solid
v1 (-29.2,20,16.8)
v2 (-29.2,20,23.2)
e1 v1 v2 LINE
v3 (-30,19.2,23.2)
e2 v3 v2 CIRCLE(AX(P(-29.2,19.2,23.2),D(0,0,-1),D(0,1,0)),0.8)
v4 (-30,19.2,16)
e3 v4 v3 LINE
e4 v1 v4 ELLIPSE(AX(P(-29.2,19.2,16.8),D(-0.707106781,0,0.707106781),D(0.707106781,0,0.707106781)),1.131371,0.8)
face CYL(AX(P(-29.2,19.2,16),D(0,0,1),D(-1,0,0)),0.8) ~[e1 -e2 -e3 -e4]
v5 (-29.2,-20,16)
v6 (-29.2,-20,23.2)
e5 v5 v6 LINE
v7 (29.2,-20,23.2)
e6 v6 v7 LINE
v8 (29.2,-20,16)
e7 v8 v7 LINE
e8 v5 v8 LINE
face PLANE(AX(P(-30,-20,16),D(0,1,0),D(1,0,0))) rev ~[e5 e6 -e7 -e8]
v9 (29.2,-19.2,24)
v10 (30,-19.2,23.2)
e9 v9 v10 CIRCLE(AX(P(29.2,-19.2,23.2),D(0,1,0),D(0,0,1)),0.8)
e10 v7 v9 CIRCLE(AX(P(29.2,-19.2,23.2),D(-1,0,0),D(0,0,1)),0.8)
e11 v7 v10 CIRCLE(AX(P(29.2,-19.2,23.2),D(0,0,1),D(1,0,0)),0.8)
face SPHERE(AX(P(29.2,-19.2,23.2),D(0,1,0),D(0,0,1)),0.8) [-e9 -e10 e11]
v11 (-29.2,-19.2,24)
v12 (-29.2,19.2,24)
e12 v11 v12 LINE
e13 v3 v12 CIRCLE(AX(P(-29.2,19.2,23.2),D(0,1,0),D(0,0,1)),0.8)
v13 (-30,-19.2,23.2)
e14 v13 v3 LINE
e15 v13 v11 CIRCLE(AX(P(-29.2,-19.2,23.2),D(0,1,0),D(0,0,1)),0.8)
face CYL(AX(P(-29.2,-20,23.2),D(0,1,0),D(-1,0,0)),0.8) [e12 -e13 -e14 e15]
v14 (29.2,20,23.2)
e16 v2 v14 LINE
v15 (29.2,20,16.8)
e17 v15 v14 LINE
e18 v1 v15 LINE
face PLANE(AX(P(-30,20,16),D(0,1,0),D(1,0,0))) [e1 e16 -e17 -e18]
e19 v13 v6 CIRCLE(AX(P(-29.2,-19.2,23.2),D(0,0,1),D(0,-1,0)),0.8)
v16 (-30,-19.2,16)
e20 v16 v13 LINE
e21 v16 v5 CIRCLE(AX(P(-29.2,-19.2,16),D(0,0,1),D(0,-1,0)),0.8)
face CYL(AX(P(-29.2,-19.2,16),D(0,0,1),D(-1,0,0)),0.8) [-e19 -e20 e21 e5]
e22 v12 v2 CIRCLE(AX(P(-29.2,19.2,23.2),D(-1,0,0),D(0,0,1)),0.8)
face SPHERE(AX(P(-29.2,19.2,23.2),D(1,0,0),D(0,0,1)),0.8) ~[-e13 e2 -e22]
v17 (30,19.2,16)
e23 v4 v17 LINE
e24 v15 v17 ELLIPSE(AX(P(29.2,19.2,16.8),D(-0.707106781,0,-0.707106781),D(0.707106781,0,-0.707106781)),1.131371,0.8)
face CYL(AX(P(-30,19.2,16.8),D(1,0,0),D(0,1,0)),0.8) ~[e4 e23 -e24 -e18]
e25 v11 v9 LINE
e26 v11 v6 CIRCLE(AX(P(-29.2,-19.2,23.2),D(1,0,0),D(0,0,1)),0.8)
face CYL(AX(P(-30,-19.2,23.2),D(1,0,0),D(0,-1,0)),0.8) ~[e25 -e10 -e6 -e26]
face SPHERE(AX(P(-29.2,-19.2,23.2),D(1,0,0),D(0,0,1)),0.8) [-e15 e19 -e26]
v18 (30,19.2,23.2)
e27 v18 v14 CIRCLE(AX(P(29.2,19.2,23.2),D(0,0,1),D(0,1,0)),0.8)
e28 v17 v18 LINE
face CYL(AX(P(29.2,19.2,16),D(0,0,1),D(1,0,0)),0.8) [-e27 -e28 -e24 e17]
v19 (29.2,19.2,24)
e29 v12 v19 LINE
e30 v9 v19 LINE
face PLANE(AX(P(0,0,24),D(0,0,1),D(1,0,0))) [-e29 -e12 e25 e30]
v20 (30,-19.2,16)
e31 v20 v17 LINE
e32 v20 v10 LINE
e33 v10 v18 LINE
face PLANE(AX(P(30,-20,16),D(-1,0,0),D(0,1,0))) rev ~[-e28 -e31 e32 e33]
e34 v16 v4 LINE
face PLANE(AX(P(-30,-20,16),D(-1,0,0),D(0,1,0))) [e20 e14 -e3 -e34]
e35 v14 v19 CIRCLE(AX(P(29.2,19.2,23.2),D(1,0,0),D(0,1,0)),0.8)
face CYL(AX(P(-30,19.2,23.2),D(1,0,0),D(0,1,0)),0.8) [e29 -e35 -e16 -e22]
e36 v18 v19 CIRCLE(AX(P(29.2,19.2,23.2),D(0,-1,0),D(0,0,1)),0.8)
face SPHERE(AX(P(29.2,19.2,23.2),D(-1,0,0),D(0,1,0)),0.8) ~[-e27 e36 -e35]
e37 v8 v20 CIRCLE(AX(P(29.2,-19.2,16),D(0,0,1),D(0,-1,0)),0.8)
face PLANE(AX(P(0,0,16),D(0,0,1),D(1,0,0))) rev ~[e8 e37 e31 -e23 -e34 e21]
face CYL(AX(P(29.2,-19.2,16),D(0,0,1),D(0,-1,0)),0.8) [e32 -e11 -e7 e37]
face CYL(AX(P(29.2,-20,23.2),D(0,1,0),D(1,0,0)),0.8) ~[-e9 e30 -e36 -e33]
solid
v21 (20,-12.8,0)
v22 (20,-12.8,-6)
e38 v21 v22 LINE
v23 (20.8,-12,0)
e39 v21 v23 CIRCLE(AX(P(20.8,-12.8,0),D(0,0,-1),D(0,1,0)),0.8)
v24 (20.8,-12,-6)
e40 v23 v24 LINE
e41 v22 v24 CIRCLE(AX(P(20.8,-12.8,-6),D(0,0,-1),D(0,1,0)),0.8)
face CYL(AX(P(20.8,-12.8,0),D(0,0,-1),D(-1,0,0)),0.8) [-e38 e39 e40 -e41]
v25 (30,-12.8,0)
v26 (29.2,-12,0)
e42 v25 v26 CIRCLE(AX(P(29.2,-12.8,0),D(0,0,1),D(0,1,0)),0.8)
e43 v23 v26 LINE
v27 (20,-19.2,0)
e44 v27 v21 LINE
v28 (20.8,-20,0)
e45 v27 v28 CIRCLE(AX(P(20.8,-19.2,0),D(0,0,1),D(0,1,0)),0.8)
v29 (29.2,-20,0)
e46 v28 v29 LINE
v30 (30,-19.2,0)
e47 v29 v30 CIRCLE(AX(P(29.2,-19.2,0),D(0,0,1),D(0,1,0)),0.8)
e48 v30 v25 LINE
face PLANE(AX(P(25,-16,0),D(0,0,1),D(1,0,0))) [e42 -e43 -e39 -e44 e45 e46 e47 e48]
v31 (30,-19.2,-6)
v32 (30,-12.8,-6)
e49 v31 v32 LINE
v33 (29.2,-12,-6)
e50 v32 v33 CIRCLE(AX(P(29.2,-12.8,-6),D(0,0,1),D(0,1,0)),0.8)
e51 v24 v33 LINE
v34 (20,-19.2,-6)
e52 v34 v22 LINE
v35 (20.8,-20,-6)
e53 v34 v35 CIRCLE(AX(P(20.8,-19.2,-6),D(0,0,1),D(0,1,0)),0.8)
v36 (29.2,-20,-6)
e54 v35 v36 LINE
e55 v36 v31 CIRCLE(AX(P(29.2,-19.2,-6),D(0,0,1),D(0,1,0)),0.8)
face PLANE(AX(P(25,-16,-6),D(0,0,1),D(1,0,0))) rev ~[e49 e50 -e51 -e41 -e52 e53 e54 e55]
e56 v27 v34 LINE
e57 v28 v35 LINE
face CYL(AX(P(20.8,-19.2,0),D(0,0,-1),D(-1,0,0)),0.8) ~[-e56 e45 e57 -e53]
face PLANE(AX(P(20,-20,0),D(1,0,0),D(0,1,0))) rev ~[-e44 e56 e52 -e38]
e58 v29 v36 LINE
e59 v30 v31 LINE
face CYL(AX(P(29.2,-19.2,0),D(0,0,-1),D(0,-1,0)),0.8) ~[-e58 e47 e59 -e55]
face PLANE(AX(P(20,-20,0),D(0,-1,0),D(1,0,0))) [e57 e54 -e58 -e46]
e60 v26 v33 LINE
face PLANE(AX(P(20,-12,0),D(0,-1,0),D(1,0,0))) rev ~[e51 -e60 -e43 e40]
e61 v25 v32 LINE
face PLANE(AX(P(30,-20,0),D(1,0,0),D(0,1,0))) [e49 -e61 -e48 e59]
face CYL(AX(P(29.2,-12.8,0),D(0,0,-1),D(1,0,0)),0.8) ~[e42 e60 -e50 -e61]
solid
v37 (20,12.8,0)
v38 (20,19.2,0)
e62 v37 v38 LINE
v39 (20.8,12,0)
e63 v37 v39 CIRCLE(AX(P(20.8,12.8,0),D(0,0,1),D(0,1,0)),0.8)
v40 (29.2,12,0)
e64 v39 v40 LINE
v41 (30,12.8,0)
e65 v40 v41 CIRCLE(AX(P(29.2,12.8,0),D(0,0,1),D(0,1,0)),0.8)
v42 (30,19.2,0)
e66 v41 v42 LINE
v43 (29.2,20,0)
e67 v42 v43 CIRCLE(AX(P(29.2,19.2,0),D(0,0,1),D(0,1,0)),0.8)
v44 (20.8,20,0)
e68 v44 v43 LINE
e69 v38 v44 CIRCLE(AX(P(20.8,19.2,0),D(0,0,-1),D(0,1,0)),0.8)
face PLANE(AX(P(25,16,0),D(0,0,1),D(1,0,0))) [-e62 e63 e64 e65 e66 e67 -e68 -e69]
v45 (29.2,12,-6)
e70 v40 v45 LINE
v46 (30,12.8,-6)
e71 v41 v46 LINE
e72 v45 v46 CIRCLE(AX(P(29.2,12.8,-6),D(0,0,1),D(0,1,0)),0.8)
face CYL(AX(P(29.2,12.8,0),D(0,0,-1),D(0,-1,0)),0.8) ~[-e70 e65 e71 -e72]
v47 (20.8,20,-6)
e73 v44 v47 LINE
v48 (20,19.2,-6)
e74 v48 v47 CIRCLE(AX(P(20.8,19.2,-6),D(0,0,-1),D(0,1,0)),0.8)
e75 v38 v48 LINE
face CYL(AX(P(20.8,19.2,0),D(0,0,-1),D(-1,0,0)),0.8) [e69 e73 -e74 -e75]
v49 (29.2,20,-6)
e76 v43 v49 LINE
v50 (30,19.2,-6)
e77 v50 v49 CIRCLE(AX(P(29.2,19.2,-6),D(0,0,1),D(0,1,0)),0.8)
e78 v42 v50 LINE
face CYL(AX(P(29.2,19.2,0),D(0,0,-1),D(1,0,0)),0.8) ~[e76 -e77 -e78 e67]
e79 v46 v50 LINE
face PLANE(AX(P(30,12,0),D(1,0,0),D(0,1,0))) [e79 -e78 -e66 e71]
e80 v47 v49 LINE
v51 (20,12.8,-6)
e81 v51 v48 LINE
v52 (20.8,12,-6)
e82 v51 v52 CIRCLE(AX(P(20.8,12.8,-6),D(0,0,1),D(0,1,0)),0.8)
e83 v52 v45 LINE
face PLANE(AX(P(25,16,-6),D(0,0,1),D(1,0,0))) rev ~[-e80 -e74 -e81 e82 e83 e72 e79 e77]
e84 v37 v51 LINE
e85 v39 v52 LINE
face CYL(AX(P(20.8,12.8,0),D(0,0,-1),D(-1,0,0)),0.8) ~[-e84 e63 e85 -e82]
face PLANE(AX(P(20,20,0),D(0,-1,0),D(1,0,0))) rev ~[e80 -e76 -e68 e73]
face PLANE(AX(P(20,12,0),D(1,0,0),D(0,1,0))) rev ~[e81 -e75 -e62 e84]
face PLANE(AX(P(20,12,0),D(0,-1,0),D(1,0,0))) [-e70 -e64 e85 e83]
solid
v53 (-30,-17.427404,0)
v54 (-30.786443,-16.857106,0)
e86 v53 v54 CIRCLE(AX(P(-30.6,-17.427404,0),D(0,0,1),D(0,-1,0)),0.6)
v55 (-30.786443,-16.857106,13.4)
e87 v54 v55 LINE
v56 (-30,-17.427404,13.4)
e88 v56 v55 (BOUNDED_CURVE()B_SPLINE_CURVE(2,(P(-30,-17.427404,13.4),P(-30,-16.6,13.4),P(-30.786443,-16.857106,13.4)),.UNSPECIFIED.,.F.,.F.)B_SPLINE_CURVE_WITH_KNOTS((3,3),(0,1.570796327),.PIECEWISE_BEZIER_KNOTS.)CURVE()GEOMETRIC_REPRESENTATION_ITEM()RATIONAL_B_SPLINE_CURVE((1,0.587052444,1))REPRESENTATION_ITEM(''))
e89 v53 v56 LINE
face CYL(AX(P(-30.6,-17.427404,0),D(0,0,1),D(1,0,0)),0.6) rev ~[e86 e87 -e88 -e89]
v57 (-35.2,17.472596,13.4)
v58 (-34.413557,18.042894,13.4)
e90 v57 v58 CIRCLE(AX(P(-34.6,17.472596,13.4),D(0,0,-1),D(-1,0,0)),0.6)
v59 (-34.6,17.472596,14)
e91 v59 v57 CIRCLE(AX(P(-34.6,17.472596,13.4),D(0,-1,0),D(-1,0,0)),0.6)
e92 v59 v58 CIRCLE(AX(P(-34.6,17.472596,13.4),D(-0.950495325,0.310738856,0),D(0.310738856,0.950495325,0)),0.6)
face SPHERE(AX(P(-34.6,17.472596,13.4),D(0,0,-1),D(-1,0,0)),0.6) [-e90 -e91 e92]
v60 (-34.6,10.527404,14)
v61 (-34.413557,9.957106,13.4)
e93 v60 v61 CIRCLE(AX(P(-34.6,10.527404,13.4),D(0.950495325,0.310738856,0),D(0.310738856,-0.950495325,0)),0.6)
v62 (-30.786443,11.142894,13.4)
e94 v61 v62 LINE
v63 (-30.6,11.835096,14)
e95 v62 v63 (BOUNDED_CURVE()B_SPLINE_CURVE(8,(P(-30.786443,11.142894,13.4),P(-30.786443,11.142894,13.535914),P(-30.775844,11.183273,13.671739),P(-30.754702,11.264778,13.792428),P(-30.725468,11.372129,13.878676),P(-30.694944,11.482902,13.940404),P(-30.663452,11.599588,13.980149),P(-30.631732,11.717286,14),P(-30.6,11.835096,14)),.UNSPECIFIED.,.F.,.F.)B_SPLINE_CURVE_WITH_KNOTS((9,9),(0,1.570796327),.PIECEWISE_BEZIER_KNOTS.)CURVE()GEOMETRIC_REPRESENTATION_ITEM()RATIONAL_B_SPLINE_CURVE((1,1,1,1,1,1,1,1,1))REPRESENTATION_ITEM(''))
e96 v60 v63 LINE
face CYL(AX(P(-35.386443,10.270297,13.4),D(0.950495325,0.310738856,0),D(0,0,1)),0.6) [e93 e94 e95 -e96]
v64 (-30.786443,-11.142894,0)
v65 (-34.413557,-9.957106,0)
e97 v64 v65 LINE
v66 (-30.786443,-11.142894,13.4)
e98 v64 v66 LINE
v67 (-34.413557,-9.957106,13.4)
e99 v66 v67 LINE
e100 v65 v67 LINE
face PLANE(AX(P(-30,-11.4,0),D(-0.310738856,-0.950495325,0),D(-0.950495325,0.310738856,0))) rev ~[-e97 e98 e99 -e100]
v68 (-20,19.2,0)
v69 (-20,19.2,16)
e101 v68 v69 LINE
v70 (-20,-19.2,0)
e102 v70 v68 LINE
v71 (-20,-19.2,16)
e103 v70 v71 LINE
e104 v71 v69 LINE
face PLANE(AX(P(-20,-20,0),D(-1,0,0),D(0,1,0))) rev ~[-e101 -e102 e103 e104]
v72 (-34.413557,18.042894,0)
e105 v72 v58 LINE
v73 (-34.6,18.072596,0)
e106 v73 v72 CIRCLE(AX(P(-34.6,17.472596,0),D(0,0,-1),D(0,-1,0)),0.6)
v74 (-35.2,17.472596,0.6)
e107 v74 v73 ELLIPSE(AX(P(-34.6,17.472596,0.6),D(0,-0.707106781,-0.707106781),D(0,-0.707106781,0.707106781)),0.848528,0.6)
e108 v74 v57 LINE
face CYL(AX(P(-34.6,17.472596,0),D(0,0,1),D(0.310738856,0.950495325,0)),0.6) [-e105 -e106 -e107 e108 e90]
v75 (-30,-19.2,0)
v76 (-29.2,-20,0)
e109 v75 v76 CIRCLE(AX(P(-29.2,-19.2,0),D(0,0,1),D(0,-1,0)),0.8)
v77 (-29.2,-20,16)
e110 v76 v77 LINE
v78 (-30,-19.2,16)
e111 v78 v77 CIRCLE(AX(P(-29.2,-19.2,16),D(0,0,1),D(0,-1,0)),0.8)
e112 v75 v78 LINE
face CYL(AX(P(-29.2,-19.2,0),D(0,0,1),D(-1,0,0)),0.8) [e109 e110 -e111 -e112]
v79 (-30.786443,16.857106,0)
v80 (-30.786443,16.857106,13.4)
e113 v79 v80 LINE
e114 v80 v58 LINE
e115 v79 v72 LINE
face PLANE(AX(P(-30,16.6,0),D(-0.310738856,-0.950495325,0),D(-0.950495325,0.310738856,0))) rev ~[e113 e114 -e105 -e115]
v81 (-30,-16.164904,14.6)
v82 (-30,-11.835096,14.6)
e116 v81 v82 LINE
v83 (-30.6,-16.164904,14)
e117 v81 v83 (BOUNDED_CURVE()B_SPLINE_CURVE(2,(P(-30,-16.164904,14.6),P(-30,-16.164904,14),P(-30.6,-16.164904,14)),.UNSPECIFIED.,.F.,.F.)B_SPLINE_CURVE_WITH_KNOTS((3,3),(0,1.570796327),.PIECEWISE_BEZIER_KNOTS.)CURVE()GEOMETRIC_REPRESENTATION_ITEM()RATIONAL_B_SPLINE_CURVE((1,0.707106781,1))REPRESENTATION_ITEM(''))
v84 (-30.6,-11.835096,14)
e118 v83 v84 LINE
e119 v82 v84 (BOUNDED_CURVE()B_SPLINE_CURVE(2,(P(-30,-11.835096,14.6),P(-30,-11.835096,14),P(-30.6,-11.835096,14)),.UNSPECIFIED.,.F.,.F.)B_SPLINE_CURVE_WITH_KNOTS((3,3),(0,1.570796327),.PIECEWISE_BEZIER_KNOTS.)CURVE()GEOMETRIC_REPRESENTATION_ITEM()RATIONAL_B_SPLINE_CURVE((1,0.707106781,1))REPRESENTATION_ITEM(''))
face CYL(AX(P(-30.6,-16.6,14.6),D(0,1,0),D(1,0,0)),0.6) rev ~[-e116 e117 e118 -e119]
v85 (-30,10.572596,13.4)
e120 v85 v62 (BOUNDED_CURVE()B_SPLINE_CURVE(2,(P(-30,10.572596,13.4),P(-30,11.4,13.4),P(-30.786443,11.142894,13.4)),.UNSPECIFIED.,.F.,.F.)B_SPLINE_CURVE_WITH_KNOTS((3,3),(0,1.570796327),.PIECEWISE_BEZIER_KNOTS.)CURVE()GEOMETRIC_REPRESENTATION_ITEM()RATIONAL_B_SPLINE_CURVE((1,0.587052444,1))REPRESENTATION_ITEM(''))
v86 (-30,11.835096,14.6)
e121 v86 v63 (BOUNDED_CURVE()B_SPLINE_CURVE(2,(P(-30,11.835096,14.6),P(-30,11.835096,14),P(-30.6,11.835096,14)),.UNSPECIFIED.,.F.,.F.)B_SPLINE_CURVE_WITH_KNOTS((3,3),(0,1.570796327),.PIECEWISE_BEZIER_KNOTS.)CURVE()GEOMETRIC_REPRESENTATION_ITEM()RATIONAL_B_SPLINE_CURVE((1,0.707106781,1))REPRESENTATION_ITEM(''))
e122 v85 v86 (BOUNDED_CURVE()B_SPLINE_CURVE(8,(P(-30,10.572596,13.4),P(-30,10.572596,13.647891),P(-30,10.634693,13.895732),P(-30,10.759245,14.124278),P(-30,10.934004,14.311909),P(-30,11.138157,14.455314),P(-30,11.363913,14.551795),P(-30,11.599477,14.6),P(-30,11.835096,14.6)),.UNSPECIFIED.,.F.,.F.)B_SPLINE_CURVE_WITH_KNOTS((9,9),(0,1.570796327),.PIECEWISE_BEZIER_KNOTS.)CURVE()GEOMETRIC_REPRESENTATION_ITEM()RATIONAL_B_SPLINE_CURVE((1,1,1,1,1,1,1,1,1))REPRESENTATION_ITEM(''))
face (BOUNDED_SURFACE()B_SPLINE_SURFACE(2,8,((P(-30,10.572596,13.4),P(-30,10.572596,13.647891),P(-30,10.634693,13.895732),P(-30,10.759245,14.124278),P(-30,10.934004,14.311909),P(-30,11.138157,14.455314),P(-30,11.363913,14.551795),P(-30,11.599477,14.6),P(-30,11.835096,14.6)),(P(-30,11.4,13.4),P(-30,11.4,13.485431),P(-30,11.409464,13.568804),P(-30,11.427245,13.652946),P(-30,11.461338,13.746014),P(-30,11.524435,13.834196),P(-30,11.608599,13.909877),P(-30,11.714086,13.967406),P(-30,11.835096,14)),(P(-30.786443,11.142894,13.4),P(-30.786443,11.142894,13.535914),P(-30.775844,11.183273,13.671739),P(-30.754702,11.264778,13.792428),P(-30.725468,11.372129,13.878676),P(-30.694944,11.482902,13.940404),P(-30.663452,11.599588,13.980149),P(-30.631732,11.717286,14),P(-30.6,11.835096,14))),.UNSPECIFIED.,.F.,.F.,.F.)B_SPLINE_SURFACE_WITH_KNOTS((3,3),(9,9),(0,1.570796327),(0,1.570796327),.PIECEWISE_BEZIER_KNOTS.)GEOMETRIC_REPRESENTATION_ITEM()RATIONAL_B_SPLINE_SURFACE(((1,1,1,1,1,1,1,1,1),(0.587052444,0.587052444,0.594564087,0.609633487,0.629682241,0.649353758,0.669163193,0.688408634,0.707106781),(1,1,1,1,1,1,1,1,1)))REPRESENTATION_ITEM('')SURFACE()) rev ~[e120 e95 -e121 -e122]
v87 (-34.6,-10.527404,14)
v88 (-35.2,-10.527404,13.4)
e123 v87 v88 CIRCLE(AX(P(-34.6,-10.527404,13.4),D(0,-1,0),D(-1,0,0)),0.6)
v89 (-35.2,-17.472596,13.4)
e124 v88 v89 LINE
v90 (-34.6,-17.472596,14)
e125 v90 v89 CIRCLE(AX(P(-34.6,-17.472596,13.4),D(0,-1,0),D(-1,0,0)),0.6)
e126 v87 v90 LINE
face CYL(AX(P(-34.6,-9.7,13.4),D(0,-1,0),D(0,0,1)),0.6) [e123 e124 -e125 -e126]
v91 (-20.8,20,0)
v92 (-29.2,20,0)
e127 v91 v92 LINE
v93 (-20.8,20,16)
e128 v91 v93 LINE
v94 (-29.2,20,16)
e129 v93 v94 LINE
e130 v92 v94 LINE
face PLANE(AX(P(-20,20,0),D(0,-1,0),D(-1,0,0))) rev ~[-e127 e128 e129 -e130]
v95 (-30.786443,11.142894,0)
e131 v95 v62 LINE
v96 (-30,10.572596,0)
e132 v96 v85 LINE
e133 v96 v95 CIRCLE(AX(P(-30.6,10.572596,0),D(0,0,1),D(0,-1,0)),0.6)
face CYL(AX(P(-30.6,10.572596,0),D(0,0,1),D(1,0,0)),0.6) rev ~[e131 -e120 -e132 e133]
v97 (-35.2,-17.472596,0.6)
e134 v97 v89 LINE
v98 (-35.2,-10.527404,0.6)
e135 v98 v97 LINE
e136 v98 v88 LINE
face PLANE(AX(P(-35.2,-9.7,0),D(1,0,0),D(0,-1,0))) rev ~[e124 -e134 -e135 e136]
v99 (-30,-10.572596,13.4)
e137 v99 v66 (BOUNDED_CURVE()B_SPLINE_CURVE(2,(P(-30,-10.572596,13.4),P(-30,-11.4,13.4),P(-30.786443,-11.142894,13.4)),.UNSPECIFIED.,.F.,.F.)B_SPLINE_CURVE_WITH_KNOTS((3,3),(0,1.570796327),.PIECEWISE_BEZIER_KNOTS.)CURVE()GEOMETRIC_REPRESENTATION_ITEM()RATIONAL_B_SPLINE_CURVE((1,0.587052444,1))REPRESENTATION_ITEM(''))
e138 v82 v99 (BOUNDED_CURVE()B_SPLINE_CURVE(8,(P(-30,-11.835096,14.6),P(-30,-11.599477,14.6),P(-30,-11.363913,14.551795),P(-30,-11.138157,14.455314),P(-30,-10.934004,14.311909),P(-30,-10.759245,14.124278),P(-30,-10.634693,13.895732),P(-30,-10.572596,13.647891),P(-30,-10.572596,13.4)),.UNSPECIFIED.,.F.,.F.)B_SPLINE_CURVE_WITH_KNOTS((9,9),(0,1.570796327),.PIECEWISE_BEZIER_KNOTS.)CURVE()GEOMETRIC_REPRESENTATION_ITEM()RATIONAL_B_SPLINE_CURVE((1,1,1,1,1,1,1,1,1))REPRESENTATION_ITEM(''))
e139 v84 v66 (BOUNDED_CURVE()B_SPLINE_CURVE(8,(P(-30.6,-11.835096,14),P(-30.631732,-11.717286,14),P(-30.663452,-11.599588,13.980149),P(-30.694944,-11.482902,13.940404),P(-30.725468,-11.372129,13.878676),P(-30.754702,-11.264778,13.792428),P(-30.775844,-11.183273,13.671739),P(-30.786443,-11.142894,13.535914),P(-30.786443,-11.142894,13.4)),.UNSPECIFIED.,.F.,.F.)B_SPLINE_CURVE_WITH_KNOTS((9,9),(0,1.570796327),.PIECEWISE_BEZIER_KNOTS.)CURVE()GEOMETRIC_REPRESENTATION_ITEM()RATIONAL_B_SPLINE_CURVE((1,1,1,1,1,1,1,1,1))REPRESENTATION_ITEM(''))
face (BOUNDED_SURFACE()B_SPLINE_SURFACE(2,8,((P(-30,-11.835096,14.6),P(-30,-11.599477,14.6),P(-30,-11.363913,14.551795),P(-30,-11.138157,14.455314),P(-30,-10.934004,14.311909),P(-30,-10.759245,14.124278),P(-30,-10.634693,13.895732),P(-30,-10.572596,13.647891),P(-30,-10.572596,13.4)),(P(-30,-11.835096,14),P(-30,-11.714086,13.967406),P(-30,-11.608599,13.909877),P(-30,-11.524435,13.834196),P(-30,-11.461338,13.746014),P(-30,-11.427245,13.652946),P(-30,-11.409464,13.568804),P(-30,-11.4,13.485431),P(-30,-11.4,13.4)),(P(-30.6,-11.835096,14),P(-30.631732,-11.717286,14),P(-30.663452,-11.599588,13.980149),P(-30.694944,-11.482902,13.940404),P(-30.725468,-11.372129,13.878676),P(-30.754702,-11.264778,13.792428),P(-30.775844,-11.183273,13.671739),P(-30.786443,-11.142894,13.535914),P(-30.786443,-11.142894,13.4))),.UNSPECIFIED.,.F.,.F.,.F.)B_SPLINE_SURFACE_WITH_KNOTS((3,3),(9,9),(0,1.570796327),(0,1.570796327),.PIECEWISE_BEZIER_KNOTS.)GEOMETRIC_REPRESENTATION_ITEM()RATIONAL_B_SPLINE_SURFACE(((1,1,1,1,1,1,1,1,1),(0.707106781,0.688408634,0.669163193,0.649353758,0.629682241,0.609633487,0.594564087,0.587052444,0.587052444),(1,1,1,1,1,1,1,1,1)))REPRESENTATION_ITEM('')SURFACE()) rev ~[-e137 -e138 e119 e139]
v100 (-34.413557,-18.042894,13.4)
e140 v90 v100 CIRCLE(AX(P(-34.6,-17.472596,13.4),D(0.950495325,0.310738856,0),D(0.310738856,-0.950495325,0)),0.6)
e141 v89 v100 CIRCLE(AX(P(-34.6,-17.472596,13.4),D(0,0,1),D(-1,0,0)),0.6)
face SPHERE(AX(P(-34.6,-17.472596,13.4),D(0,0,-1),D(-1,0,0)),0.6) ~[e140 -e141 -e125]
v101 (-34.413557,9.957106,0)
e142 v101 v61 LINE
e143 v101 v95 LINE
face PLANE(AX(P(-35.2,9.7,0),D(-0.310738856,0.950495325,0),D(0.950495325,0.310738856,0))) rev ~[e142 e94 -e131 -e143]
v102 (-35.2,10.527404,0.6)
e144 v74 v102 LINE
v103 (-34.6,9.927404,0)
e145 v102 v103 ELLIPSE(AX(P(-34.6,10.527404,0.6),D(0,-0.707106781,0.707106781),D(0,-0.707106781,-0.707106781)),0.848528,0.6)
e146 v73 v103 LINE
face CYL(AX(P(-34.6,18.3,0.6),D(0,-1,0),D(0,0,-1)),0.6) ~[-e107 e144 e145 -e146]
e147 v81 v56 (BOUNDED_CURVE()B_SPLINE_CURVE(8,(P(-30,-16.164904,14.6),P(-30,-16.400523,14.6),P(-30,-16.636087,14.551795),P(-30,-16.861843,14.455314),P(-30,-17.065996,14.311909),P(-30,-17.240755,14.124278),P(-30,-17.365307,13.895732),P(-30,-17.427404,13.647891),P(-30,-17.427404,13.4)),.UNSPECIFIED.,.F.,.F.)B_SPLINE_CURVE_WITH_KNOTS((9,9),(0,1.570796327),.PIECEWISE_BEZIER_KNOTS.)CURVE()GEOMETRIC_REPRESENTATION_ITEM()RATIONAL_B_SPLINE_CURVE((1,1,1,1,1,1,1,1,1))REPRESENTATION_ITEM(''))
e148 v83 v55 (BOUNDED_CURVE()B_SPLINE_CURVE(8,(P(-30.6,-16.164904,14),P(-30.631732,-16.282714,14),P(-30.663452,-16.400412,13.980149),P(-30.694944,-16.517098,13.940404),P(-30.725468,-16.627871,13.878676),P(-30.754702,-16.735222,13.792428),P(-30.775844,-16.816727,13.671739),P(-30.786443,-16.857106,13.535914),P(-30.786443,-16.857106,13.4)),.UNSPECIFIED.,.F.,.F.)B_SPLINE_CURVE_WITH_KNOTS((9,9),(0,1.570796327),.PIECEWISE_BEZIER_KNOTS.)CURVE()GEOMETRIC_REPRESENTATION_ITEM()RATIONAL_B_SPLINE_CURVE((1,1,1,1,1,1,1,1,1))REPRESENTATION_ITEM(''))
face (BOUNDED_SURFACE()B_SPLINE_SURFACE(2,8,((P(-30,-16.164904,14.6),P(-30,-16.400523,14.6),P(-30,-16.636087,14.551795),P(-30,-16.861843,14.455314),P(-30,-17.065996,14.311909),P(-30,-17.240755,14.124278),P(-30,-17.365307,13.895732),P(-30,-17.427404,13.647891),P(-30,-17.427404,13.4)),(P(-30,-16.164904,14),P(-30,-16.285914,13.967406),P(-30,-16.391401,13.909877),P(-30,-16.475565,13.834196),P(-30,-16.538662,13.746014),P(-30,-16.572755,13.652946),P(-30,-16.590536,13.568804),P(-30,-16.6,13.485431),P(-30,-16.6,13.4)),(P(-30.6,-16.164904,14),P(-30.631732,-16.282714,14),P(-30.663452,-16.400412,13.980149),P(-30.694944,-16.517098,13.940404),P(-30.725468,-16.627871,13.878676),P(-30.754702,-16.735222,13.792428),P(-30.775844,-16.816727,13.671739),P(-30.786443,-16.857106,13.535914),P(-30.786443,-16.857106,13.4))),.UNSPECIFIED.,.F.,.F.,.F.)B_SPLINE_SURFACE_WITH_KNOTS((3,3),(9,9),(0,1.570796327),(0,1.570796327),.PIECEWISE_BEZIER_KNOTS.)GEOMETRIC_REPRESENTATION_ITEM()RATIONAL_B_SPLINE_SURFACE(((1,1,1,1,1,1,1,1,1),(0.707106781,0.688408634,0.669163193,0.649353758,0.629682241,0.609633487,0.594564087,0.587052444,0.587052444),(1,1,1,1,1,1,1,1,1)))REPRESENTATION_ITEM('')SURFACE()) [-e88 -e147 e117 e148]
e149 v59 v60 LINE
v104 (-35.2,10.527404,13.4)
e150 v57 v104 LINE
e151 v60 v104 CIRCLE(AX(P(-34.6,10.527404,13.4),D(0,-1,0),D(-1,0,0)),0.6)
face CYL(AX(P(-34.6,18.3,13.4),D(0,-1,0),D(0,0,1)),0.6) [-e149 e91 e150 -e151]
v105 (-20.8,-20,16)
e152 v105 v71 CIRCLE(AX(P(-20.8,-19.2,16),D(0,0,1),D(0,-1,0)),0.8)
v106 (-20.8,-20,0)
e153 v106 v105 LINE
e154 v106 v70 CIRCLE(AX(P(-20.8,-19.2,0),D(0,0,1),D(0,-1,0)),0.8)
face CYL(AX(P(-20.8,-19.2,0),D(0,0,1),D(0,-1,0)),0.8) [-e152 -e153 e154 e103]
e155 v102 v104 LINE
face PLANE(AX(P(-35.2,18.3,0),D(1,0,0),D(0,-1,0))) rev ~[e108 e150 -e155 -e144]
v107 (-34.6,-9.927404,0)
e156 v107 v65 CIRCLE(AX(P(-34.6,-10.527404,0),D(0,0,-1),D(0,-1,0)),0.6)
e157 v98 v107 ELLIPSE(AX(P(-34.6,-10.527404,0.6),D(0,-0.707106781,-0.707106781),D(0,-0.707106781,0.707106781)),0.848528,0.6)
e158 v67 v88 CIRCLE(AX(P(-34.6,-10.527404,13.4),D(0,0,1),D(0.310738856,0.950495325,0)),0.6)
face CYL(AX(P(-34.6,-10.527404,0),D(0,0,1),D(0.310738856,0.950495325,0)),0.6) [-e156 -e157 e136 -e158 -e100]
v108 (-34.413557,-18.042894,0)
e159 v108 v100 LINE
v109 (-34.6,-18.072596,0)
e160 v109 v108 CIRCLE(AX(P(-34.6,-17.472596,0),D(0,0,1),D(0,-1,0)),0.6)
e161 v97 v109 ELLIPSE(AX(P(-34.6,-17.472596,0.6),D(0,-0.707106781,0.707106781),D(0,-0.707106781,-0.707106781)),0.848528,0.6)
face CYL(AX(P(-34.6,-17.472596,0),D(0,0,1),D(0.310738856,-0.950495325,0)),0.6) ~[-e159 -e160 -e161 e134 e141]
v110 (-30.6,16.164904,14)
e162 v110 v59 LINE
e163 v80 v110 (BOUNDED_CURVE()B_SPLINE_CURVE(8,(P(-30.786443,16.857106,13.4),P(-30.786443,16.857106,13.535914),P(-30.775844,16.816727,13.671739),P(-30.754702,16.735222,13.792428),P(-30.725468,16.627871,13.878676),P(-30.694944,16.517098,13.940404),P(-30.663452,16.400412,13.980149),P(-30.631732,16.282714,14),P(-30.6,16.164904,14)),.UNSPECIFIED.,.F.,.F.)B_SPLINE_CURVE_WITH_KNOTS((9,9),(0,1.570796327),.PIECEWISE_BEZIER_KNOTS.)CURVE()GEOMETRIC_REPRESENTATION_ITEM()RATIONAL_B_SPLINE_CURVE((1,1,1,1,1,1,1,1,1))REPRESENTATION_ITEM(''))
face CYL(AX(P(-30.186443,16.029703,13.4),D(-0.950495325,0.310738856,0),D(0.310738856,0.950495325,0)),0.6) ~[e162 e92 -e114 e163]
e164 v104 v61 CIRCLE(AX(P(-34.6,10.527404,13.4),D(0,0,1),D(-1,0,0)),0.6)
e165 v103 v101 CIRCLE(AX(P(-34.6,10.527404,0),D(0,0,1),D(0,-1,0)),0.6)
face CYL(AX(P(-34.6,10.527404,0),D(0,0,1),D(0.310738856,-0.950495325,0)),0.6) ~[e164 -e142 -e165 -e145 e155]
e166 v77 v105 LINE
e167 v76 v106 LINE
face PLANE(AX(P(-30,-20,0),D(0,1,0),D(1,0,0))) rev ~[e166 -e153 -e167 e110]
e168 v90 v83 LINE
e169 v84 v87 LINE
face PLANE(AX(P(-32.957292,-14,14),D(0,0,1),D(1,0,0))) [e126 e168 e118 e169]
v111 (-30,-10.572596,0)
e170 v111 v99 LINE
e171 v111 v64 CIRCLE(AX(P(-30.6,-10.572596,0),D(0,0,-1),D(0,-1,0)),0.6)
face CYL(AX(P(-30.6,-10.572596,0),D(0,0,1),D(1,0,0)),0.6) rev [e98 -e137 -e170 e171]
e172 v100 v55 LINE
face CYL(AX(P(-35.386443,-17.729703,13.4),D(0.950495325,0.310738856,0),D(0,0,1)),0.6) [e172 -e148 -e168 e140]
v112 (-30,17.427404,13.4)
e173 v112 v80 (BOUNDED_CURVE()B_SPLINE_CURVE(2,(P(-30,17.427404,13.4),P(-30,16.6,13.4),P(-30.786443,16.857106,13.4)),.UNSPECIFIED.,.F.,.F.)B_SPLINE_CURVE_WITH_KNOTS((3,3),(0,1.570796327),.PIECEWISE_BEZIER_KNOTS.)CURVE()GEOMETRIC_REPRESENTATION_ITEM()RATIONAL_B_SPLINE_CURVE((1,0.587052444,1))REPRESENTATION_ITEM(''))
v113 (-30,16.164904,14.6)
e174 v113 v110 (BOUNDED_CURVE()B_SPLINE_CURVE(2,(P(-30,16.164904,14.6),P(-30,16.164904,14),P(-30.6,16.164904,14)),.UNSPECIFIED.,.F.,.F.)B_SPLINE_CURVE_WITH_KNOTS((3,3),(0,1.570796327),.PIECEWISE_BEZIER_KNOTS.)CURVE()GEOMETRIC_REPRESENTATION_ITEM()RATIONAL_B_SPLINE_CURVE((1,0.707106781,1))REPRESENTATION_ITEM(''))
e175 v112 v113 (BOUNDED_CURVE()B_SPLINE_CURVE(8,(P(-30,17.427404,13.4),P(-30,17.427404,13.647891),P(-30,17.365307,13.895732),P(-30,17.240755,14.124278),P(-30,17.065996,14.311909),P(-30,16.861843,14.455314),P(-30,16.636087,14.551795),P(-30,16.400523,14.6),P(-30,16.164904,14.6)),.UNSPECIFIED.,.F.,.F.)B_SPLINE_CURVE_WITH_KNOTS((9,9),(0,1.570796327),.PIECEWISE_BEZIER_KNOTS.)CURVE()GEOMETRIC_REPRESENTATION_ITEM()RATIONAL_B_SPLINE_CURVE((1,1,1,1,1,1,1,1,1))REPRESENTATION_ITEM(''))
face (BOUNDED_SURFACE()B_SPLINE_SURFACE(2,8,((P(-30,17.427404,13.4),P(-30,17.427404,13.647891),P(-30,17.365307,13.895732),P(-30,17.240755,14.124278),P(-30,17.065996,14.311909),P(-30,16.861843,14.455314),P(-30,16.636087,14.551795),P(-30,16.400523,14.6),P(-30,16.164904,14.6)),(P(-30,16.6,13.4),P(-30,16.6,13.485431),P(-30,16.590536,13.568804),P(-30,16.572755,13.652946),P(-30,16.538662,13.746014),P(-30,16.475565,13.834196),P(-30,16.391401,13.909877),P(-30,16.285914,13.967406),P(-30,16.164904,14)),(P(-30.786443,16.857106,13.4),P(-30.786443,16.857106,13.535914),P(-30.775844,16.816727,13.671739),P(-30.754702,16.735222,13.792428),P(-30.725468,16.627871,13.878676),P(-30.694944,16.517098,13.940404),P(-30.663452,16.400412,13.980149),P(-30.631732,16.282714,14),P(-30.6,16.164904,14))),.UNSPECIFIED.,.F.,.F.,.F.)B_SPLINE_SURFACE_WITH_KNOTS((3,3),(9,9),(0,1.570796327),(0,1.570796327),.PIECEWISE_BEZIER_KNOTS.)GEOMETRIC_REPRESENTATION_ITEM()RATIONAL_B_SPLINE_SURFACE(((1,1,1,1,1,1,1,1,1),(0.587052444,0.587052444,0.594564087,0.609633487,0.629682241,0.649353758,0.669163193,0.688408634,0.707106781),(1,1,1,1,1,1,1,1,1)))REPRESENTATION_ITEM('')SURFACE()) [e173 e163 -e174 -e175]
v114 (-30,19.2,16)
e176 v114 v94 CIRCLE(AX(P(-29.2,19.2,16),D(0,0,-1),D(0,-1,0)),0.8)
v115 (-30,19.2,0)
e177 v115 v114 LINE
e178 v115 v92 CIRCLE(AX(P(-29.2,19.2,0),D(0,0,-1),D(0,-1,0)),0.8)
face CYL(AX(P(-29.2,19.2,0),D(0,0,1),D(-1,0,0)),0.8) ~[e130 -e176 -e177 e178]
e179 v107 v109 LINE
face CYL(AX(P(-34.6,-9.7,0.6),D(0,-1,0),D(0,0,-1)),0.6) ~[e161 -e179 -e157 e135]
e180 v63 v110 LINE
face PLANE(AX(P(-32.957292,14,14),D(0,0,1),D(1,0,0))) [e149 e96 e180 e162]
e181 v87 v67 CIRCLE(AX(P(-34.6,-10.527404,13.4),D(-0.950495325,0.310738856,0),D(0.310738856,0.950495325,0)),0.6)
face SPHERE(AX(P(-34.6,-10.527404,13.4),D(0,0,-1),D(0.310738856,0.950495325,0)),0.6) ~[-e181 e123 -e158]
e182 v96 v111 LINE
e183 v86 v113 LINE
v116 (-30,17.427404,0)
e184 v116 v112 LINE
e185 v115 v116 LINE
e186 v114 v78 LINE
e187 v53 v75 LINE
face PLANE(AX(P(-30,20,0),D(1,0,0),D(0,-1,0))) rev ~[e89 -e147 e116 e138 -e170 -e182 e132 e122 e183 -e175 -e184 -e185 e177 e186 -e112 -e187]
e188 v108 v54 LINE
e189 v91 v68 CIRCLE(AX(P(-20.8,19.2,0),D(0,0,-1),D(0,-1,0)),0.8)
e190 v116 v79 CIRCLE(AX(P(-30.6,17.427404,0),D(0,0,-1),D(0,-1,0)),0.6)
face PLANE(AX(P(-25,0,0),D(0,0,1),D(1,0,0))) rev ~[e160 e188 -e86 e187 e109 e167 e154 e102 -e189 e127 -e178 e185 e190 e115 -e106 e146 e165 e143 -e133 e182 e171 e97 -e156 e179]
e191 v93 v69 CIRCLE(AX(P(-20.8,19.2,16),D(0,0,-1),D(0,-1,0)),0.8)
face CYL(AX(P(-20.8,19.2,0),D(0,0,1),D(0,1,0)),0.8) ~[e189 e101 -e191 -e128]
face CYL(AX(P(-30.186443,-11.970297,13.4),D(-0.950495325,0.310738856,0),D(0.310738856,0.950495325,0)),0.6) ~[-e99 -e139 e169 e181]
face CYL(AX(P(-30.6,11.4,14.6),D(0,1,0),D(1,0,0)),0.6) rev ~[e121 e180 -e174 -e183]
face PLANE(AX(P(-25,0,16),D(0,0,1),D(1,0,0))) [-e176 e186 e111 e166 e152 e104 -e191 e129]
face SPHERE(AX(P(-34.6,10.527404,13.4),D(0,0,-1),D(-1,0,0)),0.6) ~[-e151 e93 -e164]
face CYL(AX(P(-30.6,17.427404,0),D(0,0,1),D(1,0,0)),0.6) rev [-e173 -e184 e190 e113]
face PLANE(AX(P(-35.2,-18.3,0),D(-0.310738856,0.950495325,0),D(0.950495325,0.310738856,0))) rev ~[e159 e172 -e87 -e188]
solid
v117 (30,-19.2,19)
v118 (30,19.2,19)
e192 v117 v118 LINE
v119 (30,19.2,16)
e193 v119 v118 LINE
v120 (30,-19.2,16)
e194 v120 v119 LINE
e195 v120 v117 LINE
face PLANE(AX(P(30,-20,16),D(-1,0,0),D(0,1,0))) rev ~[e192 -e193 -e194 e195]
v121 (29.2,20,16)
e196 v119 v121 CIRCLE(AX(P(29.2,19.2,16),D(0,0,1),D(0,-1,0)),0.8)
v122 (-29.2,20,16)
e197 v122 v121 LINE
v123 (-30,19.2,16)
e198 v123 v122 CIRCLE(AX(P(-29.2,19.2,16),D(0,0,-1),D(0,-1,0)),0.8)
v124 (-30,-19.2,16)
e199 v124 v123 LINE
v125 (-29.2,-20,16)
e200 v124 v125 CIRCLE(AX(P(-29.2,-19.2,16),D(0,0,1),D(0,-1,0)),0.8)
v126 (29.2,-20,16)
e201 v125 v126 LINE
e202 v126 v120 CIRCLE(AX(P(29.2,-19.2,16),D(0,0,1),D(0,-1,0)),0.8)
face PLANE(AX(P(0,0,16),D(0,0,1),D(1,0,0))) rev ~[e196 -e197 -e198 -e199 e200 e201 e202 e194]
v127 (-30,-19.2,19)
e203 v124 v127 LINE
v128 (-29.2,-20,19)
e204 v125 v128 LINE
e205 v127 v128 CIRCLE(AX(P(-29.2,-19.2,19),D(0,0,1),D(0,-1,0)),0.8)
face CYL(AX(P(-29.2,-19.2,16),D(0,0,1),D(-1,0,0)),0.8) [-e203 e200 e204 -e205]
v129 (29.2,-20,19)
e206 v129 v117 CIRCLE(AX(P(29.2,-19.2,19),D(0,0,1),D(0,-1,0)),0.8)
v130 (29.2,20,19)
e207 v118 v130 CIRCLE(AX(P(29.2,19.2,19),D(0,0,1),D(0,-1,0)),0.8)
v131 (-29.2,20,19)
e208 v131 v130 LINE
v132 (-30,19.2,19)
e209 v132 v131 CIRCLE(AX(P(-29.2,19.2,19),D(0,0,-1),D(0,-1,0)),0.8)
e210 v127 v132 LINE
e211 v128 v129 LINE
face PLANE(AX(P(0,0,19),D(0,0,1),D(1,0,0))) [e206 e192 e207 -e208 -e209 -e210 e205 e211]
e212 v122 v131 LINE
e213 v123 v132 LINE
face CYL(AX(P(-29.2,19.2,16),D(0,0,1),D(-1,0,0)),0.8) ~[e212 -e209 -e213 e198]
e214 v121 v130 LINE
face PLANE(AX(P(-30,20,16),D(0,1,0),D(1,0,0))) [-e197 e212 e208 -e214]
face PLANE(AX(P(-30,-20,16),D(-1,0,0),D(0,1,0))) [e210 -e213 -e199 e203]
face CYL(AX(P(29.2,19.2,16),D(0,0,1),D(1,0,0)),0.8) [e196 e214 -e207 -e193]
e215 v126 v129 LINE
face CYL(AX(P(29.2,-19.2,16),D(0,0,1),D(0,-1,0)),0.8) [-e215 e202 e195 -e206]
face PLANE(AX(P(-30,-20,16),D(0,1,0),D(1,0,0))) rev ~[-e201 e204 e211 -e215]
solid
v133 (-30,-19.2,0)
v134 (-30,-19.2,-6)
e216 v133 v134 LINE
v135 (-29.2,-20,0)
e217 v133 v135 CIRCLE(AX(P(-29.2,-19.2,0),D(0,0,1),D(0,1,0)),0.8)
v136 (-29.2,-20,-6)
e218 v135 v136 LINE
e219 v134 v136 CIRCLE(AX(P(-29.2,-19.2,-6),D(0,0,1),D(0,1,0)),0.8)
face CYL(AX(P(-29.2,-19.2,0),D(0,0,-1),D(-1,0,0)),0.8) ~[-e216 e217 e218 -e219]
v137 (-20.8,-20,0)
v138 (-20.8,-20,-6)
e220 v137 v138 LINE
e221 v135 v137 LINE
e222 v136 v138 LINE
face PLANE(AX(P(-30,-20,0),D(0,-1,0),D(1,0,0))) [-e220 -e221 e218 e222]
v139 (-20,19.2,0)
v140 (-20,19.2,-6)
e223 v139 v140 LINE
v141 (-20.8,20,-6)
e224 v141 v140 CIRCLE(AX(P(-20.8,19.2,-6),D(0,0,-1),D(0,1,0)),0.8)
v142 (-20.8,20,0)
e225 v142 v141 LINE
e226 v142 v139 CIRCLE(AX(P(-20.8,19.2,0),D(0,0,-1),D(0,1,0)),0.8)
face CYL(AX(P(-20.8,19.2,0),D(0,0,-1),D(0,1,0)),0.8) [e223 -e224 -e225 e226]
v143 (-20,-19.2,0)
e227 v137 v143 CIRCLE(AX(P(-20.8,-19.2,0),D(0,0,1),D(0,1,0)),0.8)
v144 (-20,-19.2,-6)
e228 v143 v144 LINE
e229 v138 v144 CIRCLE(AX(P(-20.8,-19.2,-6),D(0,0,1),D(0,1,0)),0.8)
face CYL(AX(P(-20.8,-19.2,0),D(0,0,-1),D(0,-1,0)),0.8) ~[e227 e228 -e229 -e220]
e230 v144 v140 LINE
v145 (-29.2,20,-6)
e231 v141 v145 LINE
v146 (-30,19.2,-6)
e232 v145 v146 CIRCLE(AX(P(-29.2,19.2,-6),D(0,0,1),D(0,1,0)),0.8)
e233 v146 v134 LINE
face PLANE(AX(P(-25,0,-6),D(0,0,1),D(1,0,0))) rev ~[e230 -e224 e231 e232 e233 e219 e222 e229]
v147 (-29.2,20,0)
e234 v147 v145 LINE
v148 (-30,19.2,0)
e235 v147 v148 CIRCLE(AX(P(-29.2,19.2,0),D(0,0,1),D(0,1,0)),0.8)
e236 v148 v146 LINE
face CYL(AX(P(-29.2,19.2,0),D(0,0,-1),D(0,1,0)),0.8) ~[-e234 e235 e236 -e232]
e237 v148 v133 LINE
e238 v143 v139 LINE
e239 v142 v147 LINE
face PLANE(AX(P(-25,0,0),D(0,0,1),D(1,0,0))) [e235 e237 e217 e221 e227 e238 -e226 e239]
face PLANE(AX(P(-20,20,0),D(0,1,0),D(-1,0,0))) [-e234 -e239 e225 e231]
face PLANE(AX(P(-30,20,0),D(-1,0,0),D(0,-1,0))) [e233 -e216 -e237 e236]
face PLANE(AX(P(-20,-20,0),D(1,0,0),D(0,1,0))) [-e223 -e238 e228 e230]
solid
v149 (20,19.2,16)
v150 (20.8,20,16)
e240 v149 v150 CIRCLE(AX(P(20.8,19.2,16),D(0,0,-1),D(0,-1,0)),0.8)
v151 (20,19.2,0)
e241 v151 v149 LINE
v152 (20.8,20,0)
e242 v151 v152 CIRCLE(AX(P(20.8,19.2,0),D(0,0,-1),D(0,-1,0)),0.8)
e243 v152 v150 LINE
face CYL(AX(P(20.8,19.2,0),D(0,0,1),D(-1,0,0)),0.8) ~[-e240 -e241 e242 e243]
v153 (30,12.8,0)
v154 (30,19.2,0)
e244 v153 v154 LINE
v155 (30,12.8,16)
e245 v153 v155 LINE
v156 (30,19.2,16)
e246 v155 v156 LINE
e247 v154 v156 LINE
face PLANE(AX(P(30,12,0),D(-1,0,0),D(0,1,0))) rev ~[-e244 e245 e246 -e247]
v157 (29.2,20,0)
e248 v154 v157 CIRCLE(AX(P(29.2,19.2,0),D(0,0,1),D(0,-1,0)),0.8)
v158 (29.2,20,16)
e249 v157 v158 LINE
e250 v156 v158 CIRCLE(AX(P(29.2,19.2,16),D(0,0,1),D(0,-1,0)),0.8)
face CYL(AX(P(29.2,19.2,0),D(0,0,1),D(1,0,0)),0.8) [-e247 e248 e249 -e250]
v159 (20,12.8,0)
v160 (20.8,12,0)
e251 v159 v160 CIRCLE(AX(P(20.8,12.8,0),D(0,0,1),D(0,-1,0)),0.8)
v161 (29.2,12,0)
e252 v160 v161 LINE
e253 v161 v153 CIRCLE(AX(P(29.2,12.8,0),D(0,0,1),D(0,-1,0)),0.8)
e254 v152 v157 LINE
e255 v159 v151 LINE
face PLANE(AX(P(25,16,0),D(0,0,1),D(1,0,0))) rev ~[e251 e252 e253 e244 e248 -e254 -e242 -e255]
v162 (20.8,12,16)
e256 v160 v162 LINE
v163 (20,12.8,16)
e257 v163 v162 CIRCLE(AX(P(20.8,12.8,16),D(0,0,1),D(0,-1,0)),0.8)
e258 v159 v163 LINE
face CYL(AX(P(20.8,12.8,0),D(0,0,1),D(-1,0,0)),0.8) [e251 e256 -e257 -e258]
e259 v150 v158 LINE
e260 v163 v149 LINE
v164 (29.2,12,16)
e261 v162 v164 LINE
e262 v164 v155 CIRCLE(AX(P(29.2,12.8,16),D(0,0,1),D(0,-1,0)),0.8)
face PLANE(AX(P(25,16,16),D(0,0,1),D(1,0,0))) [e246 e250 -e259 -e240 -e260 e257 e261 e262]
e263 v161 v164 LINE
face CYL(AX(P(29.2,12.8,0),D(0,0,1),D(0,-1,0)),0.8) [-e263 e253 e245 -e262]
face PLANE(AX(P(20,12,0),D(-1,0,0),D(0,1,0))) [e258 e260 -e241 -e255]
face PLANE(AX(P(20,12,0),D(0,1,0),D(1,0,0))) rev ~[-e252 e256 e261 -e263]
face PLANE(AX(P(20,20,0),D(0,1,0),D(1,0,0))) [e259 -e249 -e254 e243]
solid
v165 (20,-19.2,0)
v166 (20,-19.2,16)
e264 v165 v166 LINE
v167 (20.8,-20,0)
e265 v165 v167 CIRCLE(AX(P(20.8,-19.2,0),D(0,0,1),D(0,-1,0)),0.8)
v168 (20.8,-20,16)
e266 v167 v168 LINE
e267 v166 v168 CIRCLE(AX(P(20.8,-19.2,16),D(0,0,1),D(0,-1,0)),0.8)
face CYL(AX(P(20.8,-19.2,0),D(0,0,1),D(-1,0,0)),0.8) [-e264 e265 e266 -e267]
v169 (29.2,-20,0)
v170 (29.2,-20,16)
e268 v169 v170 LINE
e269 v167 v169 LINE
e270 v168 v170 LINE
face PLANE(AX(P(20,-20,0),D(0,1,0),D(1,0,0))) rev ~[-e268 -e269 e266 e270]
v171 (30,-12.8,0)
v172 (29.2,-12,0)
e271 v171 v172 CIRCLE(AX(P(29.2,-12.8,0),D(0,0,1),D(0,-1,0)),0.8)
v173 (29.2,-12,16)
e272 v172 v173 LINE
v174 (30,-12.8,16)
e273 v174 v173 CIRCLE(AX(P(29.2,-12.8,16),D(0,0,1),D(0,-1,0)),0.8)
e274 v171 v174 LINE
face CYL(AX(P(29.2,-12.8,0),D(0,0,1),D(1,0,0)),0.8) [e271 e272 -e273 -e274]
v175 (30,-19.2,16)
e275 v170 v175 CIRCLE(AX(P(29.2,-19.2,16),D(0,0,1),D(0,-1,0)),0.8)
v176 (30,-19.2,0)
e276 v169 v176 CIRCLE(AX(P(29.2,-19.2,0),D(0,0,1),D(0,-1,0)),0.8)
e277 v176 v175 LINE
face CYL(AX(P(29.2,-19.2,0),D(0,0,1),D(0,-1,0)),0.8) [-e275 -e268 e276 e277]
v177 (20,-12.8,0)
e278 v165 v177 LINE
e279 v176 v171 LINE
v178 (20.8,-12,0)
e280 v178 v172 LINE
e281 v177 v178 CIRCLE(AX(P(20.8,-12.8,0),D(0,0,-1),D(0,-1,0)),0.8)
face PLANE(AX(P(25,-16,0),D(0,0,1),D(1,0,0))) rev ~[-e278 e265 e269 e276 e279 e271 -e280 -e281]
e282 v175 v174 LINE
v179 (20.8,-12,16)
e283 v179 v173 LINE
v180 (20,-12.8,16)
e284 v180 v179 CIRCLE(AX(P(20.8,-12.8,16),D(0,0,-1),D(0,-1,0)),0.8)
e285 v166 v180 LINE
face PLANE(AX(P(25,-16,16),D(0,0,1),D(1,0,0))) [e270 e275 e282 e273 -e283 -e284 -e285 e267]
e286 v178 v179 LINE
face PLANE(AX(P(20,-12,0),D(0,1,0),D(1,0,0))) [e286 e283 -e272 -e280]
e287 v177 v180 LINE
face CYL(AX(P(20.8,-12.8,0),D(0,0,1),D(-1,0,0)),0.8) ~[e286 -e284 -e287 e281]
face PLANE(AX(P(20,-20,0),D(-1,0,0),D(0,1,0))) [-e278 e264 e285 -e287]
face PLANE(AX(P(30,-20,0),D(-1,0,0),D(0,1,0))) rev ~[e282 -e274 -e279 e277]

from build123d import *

# Parameters (mm, degrees)
F1_DEPTH = 16
F0_W     = 10
F0_H     = 8
F2_DEPTH = 14
F3_W     = 60
F3_H     = 40
F4_DEPTH = 3
F5_DEPTH = 8
F6_DEPTH = 6
F7_R     = 0.6
F8_R     = 0.8
F8_2_R   = 0.8
F8_3_R   = 0.8
F8_4_R   = 0.8
F8_5_R   = 0.8
F8_6_R   = 0.8
F8_7_R   = 0.8
F8_8_R   = 0.8


# Not quite as in the source:
# - a feature names something its author has since deleted; it is built from what else it names


with BuildPart() as f1:
    # F0 (on Top) → F1 (new body)
    with BuildSketch(Plane.XY):
        Polygon((-20, 20), (-30, 20), (-30, 16.6), (-30, 11.4), (-30, -11.4), (-30, -16.6), (-30, -20), (-20, -20), align=None)
    extrude(amount=F1_DEPTH)

    # F0 (on Top) → F2 (join)
    with BuildSketch(Plane.XY):
        Polygon((-30, -16.6), (-30, -11.4), (-35.2, -9.7), (-35.2, -18.3), align=None)
        Polygon((-30, 11.4), (-30, 16.6), (-35.2, 18.3), (-35.2, 9.7), align=None)
    extrude(amount=F2_DEPTH)

    # F7
    f7_edges = [f1.edges().sort_by_distance(p)[0] for p in [
        (-35.2, 18.3, 7),
        (-35.2, 9.7, 7),
        (-35.2, 14, 0),
        (-35.2, 14, 14),
        (-30, 14, 14),
        (-32.6, 17.45, 14),
        (-32.6, 10.55, 14),
        (-32.6, -10.55, 14),
        (-35.2, -14, 14),
        (-32.6, -17.45, 14),
        (-30, -14, 14),
        (-35.2, -9.7, 7),
        (-35.2, -18.3, 7),
        (-35.2, -14, 0),
        (-30, 16.6, 7),
        (-30, 11.4, 7),
        (-30, -11.4, 7),
        (-30, -16.6, 7),
    ]]
    fillet(f7_edges, radius=F7_R)

    # F8
    f8_edges = [f1.edges().sort_by_distance(p)[0] for p in [
        (-20, 20, 8),
        (-30, 20, 8),
        (-30, -20, 8),
        (-20, -20, 8),
    ]]
    fillet(f8_edges, radius=F8_R)


with BuildPart() as f1b:
    # F0 (on Top) → F1, piece 2 (new body)
    with BuildSketch(Plane.XY):
        with Locations((25, 16)):
            Rectangle(F0_W, F0_H)
    extrude(amount=F1_DEPTH)

    # F8#2
    f8_2_edges = [f1b.edges().sort_by_distance(p)[0] for p in [
        (30, 20, 8),
        (30, 12, 8),
        (20, 12, 8),
        (20, 20, 8),
    ]]
    fillet(f8_2_edges, radius=F8_2_R)


with BuildPart() as f1c:
    # F0 (on Top) → F1, piece 3 (new body)
    with BuildSketch(Plane.XY):
        with Locations((25, -16)):
            Rectangle(F0_W, F0_H)
    extrude(amount=F1_DEPTH)

    # F8#3
    f8_3_edges = [f1c.edges().sort_by_distance(p)[0] for p in [
        (30, -20, 8),
        (30, -12, 8),
        (20, -20, 8),
        (20, -12, 8),
    ]]
    fillet(f8_3_edges, radius=F8_3_R)


with BuildPart() as f4:
    # F3 (on face) → F4 (new body)
    with BuildSketch(Plane.XY.offset(16)):
        Rectangle(F3_W, F3_H)
    extrude(amount=F4_DEPTH)

    # F8#4
    f8_4_edges = [f4.edges().sort_by_distance(p)[0] for p in [
        (30, 20, 17.5),
        (30, -20, 17.5),
        (-30, 20, 17.5),
        (-30, -20, 17.5),
    ]]
    fillet(f8_4_edges, radius=F8_4_R)


with BuildPart() as f5:
    # F3 (on face) → F5 (new body)
    with BuildSketch(Plane.XY.offset(16)):
        Rectangle(F3_W, F3_H)
    extrude(amount=F5_DEPTH)

    # F8#5
    f8_5_edges = [f5.edges().sort_by_distance(p)[0] for p in [
        (0, 20, 16),
        (0, 20, 24),
        (30, 20, 20),
        (30, 0, 24),
        (0, -20, 24),
        (-30, 0, 24),
        (-30, -20, 20),
        (-30, 20, 20),
        (30, -20, 20),
    ]]
    fillet(f8_5_edges, radius=F8_5_R)


with BuildPart() as f6:
    # F0 (on Top) → F6 (new body)
    with BuildSketch(Plane.XY):
        Polygon((-20, 20), (-30, 20), (-30, 16.6), (-30, 11.4), (-30, -11.4), (-30, -16.6), (-30, -20), (-20, -20), align=None)
    extrude(amount=-F6_DEPTH)

    # F8#6
    f8_6_edges = [f6.edges().sort_by_distance(p)[0] for p in [
        (-20, 20, -3),
        (-30, 20, -3),
        (-30, -20, -3),
        (-20, -20, -3),
    ]]
    fillet(f8_6_edges, radius=F8_6_R)


with BuildPart() as f6b:
    # F0 (on Top) → F6, piece 2 (new body)
    with BuildSketch(Plane.XY):
        with Locations((25, -16)):
            Rectangle(F0_W, F0_H)
    extrude(amount=-F6_DEPTH)

    # F8#7
    f8_7_edges = [f6b.edges().sort_by_distance(p)[0] for p in [
        (30, -20, -3),
        (30, -12, -3),
        (20, -20, -3),
        (20, -12, -3),
    ]]
    fillet(f8_7_edges, radius=F8_7_R)


with BuildPart() as f6c:
    # F0 (on Top) → F6, piece 3 (new body)
    with BuildSketch(Plane.XY):
        with Locations((25, 16)):
            Rectangle(F0_W, F0_H)
    extrude(amount=-F6_DEPTH)

    # F8#8
    f8_8_edges = [f6c.edges().sort_by_distance(p)[0] for p in [
        (30, 20, -3),
        (30, 12, -3),
        (20, 12, -3),
        (20, 20, -3),
    ]]
    fillet(f8_8_edges, radius=F8_8_R)


solid = Compound([f1.part, f1b.part, f1c.part, f4.part, f5.part, f6.part, f6b.part, f6c.part])
